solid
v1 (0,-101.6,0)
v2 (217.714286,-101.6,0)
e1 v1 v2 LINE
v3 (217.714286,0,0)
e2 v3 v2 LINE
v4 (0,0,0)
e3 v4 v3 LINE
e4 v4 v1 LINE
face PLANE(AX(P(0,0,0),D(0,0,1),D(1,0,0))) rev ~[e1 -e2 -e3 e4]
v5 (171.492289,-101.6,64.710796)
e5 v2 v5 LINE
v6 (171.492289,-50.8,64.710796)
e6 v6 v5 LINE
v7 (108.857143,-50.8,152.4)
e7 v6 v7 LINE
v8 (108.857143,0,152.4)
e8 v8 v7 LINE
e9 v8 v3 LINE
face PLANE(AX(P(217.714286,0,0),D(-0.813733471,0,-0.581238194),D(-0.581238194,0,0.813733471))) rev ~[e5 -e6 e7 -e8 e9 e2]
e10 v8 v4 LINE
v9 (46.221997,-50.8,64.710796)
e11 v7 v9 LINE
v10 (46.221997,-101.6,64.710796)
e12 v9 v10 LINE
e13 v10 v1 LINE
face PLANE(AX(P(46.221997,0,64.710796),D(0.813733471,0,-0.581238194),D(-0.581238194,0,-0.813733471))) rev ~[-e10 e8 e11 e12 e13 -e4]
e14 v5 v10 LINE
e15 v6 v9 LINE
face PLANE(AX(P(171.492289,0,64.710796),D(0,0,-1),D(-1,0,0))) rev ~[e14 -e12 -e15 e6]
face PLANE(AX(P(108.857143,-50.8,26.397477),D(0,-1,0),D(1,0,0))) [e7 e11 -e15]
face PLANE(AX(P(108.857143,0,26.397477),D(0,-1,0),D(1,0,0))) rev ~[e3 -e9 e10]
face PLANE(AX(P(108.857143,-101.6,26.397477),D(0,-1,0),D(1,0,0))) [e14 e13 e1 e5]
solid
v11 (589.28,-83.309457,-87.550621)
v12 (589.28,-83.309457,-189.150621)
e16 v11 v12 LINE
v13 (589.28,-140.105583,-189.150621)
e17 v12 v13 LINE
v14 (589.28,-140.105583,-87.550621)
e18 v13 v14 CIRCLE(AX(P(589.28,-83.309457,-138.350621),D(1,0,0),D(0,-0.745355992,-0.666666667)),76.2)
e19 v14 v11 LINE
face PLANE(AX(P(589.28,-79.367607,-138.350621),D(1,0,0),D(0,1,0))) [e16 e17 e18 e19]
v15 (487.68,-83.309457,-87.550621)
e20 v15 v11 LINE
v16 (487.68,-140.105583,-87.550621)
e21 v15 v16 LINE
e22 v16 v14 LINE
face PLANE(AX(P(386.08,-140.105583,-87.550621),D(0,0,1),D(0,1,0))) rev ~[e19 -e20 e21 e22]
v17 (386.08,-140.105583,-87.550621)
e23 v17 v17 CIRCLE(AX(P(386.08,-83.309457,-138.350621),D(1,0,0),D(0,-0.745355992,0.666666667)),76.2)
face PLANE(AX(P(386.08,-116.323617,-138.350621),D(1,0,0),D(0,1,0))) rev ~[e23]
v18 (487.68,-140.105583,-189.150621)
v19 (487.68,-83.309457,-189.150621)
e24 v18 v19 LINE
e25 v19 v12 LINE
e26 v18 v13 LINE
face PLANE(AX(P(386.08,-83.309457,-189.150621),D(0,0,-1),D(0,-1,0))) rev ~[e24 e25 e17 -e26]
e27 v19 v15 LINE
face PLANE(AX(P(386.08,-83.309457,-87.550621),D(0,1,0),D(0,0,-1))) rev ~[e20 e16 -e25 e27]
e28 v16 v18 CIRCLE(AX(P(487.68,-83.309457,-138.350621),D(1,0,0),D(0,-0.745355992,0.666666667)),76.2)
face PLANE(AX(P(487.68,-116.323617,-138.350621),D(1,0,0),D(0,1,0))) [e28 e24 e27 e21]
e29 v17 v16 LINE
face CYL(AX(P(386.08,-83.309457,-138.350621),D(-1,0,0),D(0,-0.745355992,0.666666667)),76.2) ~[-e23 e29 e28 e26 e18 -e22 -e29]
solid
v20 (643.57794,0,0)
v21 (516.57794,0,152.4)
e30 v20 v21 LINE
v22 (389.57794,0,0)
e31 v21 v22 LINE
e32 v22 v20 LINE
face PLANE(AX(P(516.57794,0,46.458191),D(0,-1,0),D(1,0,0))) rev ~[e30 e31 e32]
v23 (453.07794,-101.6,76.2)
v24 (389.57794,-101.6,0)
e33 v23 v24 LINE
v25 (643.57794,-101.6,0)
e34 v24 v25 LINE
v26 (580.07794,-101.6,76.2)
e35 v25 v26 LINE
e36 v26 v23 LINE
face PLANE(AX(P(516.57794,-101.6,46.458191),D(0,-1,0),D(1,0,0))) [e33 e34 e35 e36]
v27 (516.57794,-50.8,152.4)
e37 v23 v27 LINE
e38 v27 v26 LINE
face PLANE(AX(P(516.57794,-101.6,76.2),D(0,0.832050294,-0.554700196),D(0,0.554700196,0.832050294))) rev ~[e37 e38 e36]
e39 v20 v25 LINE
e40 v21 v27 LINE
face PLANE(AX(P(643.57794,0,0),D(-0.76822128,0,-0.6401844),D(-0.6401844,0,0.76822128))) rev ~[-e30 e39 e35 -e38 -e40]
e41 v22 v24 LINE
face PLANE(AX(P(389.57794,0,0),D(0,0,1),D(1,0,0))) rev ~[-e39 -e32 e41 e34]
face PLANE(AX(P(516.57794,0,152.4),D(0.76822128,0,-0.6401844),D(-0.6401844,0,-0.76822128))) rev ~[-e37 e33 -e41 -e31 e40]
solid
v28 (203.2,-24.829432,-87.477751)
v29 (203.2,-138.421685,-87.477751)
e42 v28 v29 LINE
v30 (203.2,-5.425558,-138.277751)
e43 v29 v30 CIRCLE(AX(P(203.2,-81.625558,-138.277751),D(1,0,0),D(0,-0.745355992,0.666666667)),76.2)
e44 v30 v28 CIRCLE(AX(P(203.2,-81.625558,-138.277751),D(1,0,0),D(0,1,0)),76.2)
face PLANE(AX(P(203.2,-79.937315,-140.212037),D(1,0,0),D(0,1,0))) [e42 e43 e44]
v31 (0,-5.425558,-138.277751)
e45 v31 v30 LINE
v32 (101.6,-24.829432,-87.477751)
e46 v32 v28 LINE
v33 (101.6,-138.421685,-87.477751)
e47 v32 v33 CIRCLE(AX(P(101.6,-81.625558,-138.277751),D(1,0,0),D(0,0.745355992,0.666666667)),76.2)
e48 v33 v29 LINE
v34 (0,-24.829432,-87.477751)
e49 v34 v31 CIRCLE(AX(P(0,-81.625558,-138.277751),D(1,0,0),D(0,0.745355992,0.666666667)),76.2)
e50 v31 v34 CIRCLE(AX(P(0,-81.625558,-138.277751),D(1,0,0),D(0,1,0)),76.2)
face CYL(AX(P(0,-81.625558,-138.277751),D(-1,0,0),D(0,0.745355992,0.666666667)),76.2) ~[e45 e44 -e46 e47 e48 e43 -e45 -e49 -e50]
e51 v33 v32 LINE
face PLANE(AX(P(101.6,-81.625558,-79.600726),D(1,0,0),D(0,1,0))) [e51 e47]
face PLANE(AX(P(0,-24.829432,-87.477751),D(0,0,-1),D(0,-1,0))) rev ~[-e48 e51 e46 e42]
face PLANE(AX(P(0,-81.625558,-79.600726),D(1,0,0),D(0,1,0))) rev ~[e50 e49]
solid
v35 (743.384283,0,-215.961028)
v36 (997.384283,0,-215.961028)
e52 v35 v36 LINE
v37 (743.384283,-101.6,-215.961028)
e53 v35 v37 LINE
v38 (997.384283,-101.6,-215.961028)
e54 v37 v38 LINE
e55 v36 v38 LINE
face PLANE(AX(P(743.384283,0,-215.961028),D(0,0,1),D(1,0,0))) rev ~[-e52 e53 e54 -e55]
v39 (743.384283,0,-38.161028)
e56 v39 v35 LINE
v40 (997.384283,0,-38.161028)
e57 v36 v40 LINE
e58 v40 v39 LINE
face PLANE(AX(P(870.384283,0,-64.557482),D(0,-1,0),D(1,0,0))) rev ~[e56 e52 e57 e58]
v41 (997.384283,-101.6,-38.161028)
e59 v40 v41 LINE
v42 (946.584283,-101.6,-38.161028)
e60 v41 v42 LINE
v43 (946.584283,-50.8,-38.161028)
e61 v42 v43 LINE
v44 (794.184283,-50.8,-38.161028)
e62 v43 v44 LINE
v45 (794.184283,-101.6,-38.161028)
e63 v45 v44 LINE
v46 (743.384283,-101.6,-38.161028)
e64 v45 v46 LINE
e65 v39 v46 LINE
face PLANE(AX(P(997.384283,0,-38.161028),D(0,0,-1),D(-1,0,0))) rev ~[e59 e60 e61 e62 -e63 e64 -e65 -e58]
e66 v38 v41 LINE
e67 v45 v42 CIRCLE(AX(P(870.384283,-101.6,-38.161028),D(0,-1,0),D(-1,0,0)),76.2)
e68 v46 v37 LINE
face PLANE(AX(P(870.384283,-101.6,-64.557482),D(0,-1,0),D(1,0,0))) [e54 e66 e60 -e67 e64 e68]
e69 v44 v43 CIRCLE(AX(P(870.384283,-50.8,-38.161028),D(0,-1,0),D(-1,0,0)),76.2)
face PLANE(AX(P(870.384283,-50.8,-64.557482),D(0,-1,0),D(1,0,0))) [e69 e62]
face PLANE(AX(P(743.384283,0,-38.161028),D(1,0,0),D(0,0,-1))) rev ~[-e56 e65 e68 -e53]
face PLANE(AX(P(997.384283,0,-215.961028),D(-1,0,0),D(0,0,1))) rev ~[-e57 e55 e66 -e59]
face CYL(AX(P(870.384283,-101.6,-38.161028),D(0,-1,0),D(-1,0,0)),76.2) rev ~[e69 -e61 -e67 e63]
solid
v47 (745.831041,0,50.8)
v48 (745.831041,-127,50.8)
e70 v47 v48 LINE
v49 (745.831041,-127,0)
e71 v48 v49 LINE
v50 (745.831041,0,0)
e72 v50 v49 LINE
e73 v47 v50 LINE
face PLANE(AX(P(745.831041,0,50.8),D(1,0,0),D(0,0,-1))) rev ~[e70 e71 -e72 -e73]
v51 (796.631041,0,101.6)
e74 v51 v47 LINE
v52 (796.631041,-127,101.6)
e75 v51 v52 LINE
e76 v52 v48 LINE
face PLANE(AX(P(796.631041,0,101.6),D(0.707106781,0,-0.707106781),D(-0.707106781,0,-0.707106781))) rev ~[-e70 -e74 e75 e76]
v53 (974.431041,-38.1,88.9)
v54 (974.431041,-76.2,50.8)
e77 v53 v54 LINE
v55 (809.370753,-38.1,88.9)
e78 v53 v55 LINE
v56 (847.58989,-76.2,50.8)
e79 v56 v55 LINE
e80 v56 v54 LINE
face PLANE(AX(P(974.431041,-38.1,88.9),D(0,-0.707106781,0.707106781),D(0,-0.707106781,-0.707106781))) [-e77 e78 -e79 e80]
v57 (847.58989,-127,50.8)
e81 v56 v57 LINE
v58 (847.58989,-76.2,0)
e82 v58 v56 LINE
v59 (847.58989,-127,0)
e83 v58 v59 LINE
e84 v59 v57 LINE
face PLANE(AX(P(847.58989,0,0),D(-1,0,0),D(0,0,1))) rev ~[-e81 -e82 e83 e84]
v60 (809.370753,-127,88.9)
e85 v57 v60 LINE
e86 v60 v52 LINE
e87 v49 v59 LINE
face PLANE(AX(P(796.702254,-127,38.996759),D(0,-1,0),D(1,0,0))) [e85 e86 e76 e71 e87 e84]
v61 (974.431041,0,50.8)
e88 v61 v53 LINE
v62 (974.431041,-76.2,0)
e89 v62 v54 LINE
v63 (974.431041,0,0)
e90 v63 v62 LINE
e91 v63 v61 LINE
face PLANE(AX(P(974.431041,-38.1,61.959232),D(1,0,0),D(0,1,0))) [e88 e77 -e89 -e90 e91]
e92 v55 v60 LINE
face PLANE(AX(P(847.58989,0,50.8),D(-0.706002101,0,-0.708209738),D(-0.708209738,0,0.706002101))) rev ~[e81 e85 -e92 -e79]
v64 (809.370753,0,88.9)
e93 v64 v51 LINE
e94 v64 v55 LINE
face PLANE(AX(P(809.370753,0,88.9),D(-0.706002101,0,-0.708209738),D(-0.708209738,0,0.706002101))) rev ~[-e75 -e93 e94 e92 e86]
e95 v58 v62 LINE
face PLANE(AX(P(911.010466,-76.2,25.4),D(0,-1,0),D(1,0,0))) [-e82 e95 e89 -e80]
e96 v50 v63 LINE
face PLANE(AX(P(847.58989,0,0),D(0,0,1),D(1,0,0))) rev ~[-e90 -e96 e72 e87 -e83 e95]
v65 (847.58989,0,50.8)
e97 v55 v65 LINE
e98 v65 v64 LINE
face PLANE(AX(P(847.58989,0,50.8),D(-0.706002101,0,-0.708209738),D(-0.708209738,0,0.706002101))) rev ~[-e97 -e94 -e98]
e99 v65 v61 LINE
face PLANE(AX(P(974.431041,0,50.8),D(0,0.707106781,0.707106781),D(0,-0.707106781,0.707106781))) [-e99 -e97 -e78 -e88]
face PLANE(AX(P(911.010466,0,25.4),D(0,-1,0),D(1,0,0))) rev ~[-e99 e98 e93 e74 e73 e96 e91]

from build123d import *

# Parameters (mm, degrees)
F1_DEPTH  = 101.6
F2_DEPTH  = 50.8
F4_DEPTH  = 101.6
F8_DEPTH  = 76.2
F10_DEPTH = 127
F9_W      = 126.841150657
F9_H      = 50.8
F11_DEPTH = 76.2
F15_DEPTH = 203.2
F16_DEPTH = 101.6
F19_DEPTH = 203.2
F20_DEPTH = 101.6
F22_DEPTH = 101.6
F24_DEPTH = 50.8


with BuildPart() as f1:
    # F0 (on Front) → F1 (new body)
    with BuildSketch(Plane.XZ):
        Polygon((46.2219970567, 64.7107958794), (0, 0), (217.7142857143, 0), (171.4922886576, 64.7107958794), (108.8571428571, 64.7107958794), align=None)
    extrude(amount=F1_DEPTH)

    # F0 (on Front) → F2 (join)
    with BuildSketch(Plane.XZ):
        Polygon((46.2219970567, 64.7107958794), (0, 0), (217.7142857143, 0), (171.4922886576, 64.7107958794), (108.8571428571, 64.7107958794), align=None)
        Polygon((108.8571428571, 152.4), (46.2219970567, 64.7107958794), (108.8571428571, 64.7107958794), (171.4922886576, 64.7107958794), align=None)
    extrude(amount=F2_DEPTH)


with BuildPart() as f4:
    # F3 (on Front) → F4 (new body)
    with BuildSketch(Plane.XZ):
        Polygon((516.5779400596, 152.4), (389.5779400596, 0), (643.5779400596, 0), align=None)
    extrude(amount=F4_DEPTH)

    # F7 (on 3pt) → F8 (cut, symmetric)
    with BuildSketch(Plane.YZ.offset(516.5779400596)):
        Polygon((-50.8, 152.4), (-101.6, 152.4), (-101.6, 76.2), align=None)
    extrude(amount=F8_DEPTH, both=True, mode=Mode.SUBTRACT)


with BuildPart() as f10:
    # F9 (on Front) → F10 (new body)
    with BuildSketch(Plane.XZ):
        Polygon((745.8310411218, 50.8), (745.8310411218, 0), (847.5898904648, 0), (847.5898904648, 50.8), (809.3707534576, 88.9), (796.6310411218, 101.6), align=None)
    extrude(amount=F10_DEPTH)

    # F9 (on Front) → F11 (join)
    with BuildSketch(Plane.XZ):
        with Locations((911.0104657933, 25.4)):
            Rectangle(F9_W, F9_H)
    extrude(amount=F11_DEPTH)

    # F12 (on face) → F13 (join, up to the next surface of F10)
    with BuildSketch(Plane.YZ.offset(974.4310411218)):
        Polygon((-38.1, 88.9), (-76.2, 50.8), (0, 50.8), align=None)
    extrude(until=Until.NEXT, dir=(-1, 0, 0))


with BuildPart() as f15:
    # F14 (on Right) → F15 (new body)
    with BuildSketch(Plane.YZ):
        with BuildLine():
            ThreePointArc((-138.4216850644, -87.4777510762), (-108.8154016766, -209.4616848292), (-5.4255584359, -138.2777510762))
            ThreePointArc((-5.4255584359, -138.2777510762), (-10.441624683, -111.0879078355), (-24.8294318074, -87.4777510762))
            Line((-24.8294318074, -87.4777510762), (-81.6255584359, -87.4777510762))
            Line((-81.6255584359, -87.4777510762), (-138.4216850644, -87.4777510762))
        make_face()
    extrude(amount=F15_DEPTH)

    # F14 (on Right) → F16 (join)
    with BuildSketch(Plane.YZ):
        with BuildLine():
            Line((-81.6255584359, -87.4777510762), (-24.8294318074, -87.4777510762))
            ThreePointArc((-24.8294318074, -87.4777510762), (-81.6255584359, -62.0777510762), (-138.4216850644, -87.4777510762))
            Line((-138.4216850644, -87.4777510762), (-81.6255584359, -87.4777510762))
        make_face()
    extrude(amount=F16_DEPTH)


with BuildPart() as f19:
    # F18 (on offset) → F19 (new body)
    with BuildSketch(Plane.YZ.offset(386.08)):
        with BuildLine():
            ThreePointArc((-140.1055833345, -189.1506208658), (-56.1196134653, -209.5345546188), (-7.109456706, -138.3506208658))
            ThreePointArc((-7.109456706, -138.3506208658), (-56.1196134653, -67.1666871129), (-140.1055833345, -87.5506208658))
            Line((-140.1055833345, -87.5506208658), (-83.309456706, -87.5506208658))
            Line((-83.309456706, -87.5506208658), (-83.309456706, -189.1506208658))
            Line((-83.309456706, -189.1506208658), (-140.1055833345, -189.1506208658))
        make_face()
    extrude(amount=F19_DEPTH)

    # F18 (on offset) → F20 (join)
    with BuildSketch(Plane.YZ.offset(386.08)):
        with BuildLine():
            Line((-83.309456706, -87.5506208658), (-140.1055833345, -87.5506208658))
            ThreePointArc((-140.1055833345, -87.5506208658), (-159.509456706, -138.3506208658), (-140.1055833345, -189.1506208658))
            Line((-140.1055833345, -189.1506208658), (-83.309456706, -189.1506208658))
            Line((-83.309456706, -189.1506208658), (-83.309456706, -87.5506208658))
        make_face()
    extrude(amount=F20_DEPTH)


with BuildPart() as f22:
    # F21 (on Front) → F22 (new body)
    with BuildSketch(Plane.XZ):
        with BuildLine():
            Line((946.5842827101, -38.1610280335), (794.1842827101, -38.1610280335))
            ThreePointArc((794.1842827101, -38.1610280335), (870.3842827101, -114.3610280335), (946.5842827101, -38.1610280335))
        make_face()
        with BuildLine():
            Line((743.3842827101, -38.1610280335), (743.3842827101, -215.9610280335))
            Line((743.3842827101, -215.9610280335), (997.3842827101, -215.9610280335))
            Line((997.3842827101, -215.9610280335), (997.3842827101, -38.1610280335))
            Line((997.3842827101, -38.1610280335), (946.5842827101, -38.1610280335))
            ThreePointArc((946.5842827101, -38.1610280335), (870.3842827101, -114.3610280335), (794.1842827101, -38.1610280335))
            Line((794.1842827101, -38.1610280335), (743.3842827101, -38.1610280335))
        make_face()
    extrude(amount=F22_DEPTH)

    # F23 (on face) → F24 (cut)
    with BuildSketch(Plane.XZ.offset(101.6)):
        with BuildLine():
            Line((946.5842827101, -38.1610280335), (794.1842827101, -38.1610280335))
            ThreePointArc((794.1842827101, -38.1610280335), (870.3842827101, -114.3610280335), (946.5842827101, -38.1610280335))
        make_face()
    extrude(amount=-F24_DEPTH, mode=Mode.SUBTRACT)


solid = Compound([f1.part, f4.part, f10.part, f15.part, f19.part, f22.part])
